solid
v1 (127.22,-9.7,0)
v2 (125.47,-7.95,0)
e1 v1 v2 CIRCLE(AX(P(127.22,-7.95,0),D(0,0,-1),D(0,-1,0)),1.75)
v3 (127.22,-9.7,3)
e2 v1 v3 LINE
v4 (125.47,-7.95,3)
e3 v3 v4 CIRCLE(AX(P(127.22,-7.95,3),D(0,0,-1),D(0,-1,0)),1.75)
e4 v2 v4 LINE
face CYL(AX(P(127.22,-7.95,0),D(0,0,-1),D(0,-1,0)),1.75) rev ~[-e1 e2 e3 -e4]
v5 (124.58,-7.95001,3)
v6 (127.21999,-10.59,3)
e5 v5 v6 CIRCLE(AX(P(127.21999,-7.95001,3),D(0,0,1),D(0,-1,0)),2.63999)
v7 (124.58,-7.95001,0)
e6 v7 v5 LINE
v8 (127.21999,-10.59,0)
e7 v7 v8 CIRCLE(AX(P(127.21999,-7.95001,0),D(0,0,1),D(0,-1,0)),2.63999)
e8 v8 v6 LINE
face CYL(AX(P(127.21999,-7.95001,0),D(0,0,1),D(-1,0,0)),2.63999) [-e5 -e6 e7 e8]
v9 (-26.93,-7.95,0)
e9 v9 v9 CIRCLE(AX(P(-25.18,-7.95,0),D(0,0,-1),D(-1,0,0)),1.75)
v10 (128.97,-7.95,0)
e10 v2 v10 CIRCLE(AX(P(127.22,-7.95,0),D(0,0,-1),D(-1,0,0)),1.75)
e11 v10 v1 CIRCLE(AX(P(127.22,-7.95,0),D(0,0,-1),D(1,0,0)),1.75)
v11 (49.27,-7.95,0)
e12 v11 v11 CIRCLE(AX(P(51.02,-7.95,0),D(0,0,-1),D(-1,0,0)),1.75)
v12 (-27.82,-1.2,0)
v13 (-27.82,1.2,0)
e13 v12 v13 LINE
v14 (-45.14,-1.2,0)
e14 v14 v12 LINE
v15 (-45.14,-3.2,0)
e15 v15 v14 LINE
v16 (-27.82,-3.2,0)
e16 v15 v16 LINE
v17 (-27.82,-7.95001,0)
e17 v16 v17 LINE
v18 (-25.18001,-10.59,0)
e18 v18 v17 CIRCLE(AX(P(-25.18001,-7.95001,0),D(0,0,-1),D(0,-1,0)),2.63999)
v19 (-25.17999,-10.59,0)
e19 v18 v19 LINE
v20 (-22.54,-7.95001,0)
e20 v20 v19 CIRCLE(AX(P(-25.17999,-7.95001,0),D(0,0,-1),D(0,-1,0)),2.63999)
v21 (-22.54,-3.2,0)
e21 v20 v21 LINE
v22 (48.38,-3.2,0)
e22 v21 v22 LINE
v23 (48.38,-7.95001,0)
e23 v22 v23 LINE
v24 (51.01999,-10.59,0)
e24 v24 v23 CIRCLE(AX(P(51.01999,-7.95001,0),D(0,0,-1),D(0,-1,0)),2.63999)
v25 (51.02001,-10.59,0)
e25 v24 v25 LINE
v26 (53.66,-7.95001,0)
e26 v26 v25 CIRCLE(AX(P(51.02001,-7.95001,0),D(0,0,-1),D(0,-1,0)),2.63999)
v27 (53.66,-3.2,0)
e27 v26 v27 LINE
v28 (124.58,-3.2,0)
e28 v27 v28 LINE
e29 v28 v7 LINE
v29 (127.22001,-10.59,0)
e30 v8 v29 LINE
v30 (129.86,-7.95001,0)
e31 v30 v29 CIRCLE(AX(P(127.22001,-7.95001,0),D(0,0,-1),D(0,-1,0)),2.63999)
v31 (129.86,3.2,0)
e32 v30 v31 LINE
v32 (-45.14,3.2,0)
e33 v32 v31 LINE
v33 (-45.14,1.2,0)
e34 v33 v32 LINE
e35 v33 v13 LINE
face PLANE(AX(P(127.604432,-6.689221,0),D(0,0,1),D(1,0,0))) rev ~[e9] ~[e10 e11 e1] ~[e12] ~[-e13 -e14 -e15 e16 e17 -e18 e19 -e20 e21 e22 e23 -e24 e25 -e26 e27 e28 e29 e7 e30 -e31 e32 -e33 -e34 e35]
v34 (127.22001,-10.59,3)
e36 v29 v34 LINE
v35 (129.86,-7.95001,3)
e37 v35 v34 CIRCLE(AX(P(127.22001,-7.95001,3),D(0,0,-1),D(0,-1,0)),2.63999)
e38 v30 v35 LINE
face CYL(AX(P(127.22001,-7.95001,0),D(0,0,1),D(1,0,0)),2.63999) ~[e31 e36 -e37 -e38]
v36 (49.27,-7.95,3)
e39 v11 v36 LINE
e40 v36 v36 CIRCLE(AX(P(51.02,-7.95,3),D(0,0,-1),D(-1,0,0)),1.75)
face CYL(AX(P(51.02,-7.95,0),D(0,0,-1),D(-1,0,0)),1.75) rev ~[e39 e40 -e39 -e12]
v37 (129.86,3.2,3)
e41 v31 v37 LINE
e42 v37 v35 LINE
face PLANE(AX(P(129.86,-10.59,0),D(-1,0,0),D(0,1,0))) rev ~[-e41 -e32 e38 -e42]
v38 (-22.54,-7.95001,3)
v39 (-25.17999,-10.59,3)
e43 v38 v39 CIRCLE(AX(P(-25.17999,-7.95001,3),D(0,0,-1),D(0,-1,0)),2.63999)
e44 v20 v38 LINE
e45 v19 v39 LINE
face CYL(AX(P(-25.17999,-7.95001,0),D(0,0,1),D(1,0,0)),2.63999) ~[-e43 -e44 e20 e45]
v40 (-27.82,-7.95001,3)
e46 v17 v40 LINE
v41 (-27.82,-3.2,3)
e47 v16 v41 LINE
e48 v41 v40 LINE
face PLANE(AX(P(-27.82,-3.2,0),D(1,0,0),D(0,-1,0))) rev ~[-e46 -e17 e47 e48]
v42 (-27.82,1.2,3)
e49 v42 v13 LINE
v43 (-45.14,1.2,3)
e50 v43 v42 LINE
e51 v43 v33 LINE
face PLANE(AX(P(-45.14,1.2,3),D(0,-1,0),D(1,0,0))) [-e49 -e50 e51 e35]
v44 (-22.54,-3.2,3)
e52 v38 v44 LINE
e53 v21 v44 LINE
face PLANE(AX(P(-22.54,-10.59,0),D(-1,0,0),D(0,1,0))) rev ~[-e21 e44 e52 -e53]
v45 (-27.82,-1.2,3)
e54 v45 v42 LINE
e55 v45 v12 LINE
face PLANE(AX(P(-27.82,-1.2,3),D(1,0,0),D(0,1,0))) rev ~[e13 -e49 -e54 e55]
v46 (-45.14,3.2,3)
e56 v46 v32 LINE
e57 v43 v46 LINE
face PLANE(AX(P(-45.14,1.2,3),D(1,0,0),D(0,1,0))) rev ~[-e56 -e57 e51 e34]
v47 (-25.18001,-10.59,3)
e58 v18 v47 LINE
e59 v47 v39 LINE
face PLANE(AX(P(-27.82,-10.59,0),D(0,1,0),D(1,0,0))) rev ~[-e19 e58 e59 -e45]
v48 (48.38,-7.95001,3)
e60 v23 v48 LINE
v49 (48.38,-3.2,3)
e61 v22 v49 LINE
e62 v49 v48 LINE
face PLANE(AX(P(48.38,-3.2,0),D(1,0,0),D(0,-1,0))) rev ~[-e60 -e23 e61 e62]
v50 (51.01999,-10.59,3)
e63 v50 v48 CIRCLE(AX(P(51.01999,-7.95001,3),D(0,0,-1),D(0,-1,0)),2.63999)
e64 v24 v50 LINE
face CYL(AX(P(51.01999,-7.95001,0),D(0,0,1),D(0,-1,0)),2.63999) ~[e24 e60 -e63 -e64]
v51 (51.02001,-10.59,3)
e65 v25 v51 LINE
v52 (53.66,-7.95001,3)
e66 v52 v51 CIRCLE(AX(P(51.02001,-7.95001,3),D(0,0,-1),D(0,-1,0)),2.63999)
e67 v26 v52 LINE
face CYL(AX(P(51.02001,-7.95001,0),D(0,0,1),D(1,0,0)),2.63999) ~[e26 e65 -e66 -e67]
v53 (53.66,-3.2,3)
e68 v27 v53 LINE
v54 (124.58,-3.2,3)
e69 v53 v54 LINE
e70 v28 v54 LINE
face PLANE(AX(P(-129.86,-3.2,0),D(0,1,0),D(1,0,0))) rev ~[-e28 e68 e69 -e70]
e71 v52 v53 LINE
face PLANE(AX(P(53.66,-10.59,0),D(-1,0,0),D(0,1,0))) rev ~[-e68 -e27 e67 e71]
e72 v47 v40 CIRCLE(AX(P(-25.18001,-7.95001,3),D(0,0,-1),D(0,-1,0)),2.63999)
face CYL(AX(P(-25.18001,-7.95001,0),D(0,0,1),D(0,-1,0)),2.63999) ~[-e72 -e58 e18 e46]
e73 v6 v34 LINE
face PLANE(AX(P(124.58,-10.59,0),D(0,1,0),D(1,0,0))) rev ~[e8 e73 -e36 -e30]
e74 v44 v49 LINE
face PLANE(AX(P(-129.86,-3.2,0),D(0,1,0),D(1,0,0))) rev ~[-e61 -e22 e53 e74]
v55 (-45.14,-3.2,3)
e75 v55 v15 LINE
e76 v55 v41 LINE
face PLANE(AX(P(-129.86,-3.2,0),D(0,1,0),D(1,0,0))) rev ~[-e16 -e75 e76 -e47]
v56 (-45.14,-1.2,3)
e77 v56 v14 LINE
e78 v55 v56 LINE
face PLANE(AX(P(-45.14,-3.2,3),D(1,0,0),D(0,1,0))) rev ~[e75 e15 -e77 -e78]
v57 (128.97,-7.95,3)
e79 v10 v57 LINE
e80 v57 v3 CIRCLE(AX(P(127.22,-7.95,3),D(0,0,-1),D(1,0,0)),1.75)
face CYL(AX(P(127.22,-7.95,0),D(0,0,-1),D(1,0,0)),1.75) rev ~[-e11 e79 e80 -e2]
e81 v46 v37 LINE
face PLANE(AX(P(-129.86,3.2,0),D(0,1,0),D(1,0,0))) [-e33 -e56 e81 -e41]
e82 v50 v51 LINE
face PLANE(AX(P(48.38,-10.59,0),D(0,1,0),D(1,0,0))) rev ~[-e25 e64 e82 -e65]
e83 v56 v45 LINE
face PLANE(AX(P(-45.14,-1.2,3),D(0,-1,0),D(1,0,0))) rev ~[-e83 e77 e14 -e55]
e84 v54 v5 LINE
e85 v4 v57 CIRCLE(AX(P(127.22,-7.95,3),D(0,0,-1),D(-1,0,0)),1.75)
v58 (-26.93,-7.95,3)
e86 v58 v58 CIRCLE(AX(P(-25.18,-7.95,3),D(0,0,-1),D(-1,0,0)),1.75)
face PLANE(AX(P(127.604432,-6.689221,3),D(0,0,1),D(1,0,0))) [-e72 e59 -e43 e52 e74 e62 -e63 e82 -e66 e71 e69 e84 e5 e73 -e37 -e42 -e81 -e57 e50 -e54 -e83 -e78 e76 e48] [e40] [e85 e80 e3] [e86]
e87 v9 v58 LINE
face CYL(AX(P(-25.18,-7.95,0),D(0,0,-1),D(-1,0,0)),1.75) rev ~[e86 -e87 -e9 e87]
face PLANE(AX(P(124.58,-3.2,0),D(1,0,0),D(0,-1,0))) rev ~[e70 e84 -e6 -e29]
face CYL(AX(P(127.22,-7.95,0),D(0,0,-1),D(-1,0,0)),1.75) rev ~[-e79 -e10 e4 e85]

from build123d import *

# Parameters (mm, degrees)
F0_W     = 259.72
F0_H     = 6.4
F1_DEPTH = 3
F3_DEPTH = 3
F4_R     = 2.63999
F5_W     = 17.32
F5_H     = 2.4
F6_DEPTH = 3.001


# Not quite as in the source:
# - a fillet or chamfer is up to 0.001 mm smaller than in the source, because OpenCascade refuses the exact size


with BuildPart() as f1:
    # F0 (on Top) → F1 (new body)
    with BuildSketch(Plane.XY):
        Rectangle(F0_W, F0_H)
    extrude(amount=F1_DEPTH)

    # F2 (on Top) → F3 (join)
    with BuildSketch(Plane.XY):
        with BuildLine():
            Line((129.86, -10.59), (129.86, -3.2))
            Line((129.86, -3.2), (124.58, -3.2))
            Line((124.58, -3.2), (124.58, -7.95))
            Line((124.58, -7.95), (125.47, -7.95))
            ThreePointArc((125.47, -7.95), (127.22, -6.2), (128.97, -7.95))
            ThreePointArc((128.97, -7.95), (128.4574368671, -9.1874368671), (127.22, -9.7))
            Line((127.22, -9.7), (127.22, -10.59))
            Line((127.22, -10.59), (129.86, -10.59))
        make_face()
        with BuildLine():
            Line((125.47, -7.95), (124.58, -7.95))
            Line((124.58, -7.95), (124.58, -10.59))
            Line((124.58, -10.59), (127.22, -10.59))
            Line((127.22, -10.59), (127.22, -9.7))
            ThreePointArc((127.22, -9.7), (125.9825631329, -9.1874368671), (125.47, -7.95))
        make_face()
        Polygon((53.66, -10.59), (53.66, -3.2), (48.38, -3.2), (48.38, -7.95), (48.38, -10.59), align=None)
        with BuildLine():
            ThreePointArc((52.77, -7.95), (51.02, -9.7), (49.27, -7.95))
            ThreePointArc((49.27, -7.95), (51.02, -6.2), (52.77, -7.95))
        make_face(mode=Mode.SUBTRACT)
        Polygon((-22.54, -3.2), (-27.82, -3.2), (-27.82, -7.95), (-27.82, -10.59), (-22.54, -10.59), align=None)
        with BuildLine():
            ThreePointArc((-23.43, -7.95), (-25.18, -9.7), (-26.93, -7.95))
            ThreePointArc((-26.93, -7.95), (-25.18, -6.2), (-23.43, -7.95))
        make_face(mode=Mode.SUBTRACT)
    extrude(amount=F3_DEPTH)

    # F4 (radius 2.64 in the source; OpenCascade refuses exactly that, so slightly less here)
    f4_edges = [f1.edges().sort_by_distance(p)[0] for p in [
        (48.38, -10.59, 1.5),
        (53.66, -10.59, 1.5),
        (124.58, -10.59, 1.5),
        (129.86, -10.59, 1.5),
        (-27.82, -10.59, 1.5),
        (-22.54, -10.59, 1.5),
    ]]
    fillet(f4_edges, radius=F4_R)

    # F5 (on face) → F6 (cut, through all)
    with BuildSketch(Plane.XY.offset(3)):
        Polygon((-45.14, 3.2), (-129.86, 3.2), (-129.86, -3.2), (-45.14, -3.2), (-45.14, -1.2), (-45.14, 1.2), align=None)
        with Locations((-36.48, 0)):
            Rectangle(F5_W, F5_H)
    extrude(amount=-F6_DEPTH, mode=Mode.SUBTRACT)


solid = f1.part
